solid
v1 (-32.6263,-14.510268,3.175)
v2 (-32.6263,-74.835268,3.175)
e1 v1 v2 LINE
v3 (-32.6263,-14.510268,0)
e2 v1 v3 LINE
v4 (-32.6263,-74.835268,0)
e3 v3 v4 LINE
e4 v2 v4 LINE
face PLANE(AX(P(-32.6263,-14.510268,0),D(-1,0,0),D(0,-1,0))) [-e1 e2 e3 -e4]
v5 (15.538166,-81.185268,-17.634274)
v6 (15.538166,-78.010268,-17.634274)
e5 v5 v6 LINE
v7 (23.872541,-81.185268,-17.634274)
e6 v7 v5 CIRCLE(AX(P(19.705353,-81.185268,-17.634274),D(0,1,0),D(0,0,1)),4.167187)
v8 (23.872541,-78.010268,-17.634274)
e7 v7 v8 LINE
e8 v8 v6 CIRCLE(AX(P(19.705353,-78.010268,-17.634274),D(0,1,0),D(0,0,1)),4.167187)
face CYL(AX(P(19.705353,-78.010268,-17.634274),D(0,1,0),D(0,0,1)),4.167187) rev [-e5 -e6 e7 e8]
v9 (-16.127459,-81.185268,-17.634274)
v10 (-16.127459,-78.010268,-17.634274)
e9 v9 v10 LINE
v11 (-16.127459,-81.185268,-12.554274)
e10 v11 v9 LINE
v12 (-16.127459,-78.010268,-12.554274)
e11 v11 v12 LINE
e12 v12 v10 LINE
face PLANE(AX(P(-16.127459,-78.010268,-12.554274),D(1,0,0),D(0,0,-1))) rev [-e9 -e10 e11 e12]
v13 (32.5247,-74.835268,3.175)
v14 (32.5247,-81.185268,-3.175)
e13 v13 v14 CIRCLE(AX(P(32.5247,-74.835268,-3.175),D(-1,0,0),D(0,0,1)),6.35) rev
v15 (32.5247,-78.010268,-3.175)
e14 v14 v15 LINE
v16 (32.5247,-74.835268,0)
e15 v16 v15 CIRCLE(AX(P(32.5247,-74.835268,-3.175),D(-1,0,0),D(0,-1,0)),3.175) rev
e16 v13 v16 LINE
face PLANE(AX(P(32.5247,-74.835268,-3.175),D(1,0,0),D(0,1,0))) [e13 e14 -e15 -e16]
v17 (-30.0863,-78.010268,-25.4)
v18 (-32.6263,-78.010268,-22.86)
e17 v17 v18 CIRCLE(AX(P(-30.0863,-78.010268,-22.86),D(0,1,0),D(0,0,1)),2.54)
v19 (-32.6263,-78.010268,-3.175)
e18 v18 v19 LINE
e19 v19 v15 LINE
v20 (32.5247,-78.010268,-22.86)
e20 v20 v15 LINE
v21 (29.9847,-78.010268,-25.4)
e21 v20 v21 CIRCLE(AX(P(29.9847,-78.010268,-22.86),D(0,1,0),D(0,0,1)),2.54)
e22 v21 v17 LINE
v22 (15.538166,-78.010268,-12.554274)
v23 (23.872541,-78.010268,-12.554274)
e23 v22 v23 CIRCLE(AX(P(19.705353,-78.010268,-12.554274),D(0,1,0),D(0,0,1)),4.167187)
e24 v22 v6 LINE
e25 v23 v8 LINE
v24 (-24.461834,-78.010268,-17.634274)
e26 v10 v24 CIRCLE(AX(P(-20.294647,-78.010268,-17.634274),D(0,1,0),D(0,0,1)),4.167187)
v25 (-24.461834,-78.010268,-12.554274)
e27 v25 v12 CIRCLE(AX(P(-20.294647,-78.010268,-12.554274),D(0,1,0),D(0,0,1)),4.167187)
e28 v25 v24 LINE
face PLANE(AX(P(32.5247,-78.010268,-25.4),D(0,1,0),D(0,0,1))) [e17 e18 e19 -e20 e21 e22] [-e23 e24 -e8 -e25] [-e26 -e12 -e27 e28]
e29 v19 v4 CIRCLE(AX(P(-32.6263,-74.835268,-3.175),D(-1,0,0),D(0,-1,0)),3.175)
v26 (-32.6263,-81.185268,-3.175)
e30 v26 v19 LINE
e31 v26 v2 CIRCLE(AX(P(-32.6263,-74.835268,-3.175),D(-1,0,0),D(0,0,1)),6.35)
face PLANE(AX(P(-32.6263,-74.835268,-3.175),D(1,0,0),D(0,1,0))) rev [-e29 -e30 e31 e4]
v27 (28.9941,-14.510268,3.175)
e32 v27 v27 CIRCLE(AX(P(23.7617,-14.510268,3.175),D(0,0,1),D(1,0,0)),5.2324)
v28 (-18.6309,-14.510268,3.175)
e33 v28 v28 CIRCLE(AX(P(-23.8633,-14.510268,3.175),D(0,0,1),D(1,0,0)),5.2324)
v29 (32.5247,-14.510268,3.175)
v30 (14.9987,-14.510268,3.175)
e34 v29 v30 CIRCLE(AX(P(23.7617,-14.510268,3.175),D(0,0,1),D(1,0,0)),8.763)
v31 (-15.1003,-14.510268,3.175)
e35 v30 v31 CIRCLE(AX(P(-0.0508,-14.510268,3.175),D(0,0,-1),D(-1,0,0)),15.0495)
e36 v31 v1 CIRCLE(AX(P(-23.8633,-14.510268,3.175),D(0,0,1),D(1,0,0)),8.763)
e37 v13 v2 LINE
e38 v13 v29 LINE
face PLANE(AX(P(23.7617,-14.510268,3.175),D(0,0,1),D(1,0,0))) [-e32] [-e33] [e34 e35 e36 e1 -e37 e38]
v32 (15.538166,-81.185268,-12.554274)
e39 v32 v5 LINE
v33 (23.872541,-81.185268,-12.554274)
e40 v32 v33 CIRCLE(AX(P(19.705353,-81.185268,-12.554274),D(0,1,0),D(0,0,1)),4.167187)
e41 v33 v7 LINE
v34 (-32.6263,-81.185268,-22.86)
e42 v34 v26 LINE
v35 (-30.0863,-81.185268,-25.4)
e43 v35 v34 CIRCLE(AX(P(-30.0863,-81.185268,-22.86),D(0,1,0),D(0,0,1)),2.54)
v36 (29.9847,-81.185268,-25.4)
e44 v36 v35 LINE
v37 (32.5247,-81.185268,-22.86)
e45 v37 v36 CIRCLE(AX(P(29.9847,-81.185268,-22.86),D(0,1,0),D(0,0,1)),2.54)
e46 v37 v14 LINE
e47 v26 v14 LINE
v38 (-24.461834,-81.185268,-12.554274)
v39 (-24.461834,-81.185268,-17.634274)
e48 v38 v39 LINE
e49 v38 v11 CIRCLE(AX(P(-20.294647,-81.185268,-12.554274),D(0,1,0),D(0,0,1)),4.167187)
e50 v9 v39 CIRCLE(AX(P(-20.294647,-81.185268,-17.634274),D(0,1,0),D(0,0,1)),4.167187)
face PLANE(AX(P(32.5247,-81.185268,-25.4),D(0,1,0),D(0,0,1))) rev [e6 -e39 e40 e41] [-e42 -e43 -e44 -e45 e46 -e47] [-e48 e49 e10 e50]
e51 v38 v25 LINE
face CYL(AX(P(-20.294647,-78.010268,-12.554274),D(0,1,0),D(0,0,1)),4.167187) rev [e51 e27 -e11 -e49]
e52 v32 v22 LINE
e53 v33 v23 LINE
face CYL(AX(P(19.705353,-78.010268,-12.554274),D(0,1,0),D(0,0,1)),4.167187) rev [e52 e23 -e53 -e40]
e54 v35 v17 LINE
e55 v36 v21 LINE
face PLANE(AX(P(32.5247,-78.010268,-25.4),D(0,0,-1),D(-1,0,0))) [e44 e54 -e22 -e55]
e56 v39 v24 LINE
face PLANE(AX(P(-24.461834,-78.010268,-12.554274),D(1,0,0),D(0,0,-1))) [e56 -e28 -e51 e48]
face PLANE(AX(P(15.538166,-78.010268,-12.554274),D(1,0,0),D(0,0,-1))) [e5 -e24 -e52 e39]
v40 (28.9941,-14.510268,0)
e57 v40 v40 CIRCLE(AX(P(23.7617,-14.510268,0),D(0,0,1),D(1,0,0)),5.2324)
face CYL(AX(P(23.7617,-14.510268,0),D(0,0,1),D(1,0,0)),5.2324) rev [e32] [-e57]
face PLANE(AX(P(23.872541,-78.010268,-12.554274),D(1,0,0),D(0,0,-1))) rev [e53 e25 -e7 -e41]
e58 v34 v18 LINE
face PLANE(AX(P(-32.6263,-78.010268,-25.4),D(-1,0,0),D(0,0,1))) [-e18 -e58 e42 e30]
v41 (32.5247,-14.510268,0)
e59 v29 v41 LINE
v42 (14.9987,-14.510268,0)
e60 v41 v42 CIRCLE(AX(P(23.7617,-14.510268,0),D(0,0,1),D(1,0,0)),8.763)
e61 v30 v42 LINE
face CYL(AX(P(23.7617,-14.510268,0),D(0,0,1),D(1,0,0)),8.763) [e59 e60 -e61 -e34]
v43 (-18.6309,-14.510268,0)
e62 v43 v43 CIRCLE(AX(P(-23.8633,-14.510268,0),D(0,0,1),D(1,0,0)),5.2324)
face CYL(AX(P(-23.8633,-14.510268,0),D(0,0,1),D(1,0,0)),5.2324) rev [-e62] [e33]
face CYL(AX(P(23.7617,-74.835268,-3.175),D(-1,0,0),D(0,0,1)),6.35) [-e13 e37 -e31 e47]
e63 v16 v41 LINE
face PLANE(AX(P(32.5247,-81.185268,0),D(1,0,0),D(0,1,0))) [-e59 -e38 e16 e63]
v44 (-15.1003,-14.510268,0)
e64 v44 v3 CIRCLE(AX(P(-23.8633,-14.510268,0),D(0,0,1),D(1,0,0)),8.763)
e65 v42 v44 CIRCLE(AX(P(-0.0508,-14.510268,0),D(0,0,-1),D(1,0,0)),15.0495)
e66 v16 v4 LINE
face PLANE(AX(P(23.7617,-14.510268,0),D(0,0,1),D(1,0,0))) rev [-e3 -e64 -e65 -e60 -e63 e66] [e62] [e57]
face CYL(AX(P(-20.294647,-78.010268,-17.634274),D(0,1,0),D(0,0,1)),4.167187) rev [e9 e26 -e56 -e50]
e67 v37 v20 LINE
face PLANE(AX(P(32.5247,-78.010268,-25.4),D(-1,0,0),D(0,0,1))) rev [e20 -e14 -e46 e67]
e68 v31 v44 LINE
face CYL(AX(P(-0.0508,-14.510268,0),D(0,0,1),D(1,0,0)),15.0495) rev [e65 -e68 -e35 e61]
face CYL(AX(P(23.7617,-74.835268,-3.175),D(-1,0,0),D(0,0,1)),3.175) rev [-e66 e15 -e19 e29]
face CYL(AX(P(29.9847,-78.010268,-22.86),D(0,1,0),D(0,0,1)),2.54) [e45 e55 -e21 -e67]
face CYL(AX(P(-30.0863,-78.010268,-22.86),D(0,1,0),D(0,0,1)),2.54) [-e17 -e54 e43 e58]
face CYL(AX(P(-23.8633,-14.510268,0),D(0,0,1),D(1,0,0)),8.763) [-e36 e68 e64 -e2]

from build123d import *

# Parameters (mm, degrees)
SKETCH1_R              = 5.2324
BOSS_EXTRUDE1_DEPTH    = 3.175
SKETCH2_W              = 65.151
SKETCH2_H              = 3.175
BOSS_EXTRUDE2_DEPTH    = 25.4
FILLET1_R              = 2.54
CUT_EXTRUDE1_DEPTH     = 3.175
CONVERT_SOLID1_START   = -32.6263
CONVERT_SOLID1_DEPTH   = 65.151
CONVERT_SOLID1_2_DEPTH = 65.151


# Read off the part's stored shape, not the designer's step: Convert-Solid1
with BuildPart() as part:
    # Sketch1 → Boss-Extrude1 (new body)
    with BuildSketch(Plane.XY):
        with BuildLine():
            Line((32.5247, -81.185268118), (32.5247, -14.510268118))
            ThreePointArc((32.5247, -14.510268118), (23.7617, -5.747268118), (14.9987, -14.510268118))
            ThreePointArc((14.9987, -14.510268118), (-0.0508, -29.559768118), (-15.1003, -14.510268118))
            ThreePointArc((-15.1003, -14.510268118), (-23.8633, -5.747268118), (-32.6263, -14.510268118))
            Line((-32.6263, -14.510268118), (-32.6263, -81.185268118))
            Line((-32.6263, -81.185268118), (32.5247, -81.185268118))
        make_face()
        with Locations((-23.8633, -14.510268118)):
            Circle(SKETCH1_R, mode=Mode.SUBTRACT)
        with Locations((23.7617, -14.510268118)):
            Circle(SKETCH1_R, mode=Mode.SUBTRACT)
    extrude(amount=BOSS_EXTRUDE1_DEPTH)

    # Sketch2 → Boss-Extrude2 (add)
    with BuildSketch(Plane(origin=(0, 0, 0), x_dir=(-1, 0, 0), z_dir=(0, 0, -1))):
        with Locations((0.0508, -79.597768118)):
            Rectangle(SKETCH2_W, SKETCH2_H)
    extrude(amount=BOSS_EXTRUDE2_DEPTH)

    # Fillet1
    fillet1_edges = [part.edges().sort_by_distance(p)[0] for p in [
        (32.5247, -79.597768118, -25.4),
        (-32.6263, -79.597768118, -25.4),
    ]]
    fillet(fillet1_edges, radius=FILLET1_R)

    # Sketch3 → Cut-Extrude1 (cut)
    with BuildSketch(Plane(origin=(0, -78.010268118, 0), x_dir=(1, 0, 0), z_dir=(0, 1, 0))):
        with BuildLine():
            Line((15.538165915, 12.554273752), (15.538165915, 17.634273752))
            ThreePointArc((15.538165915, 17.634273752), (19.705353415, 21.801461252), (23.872540915, 17.634273752))
            Line((23.872540915, 17.634273752), (23.872540915, 12.554273752))
            ThreePointArc((23.872540915, 12.554273752), (19.705353415, 8.387086252), (15.538165915, 12.554273752))
        make_face()
        with BuildLine():
            Line((-24.461834085, 12.554273752), (-24.461834085, 17.634273752))
            ThreePointArc((-24.461834085, 17.634273752), (-20.294646585, 21.801461252), (-16.127459085, 17.634273752))
            Line((-16.127459085, 17.634273752), (-16.127459085, 12.554273752))
            ThreePointArc((-16.127459085, 12.554273752), (-20.294646585, 8.387086252), (-24.461834085, 12.554273752))
        make_face()
    extrude(amount=-CUT_EXTRUDE1_DEPTH, mode=Mode.SUBTRACT)

    # Convert-Solid1 outline → Convert-Solid1 (cut)
    with BuildSketch(Plane.YZ.offset(CONVERT_SOLID1_START)):
        with BuildLine():
            Line((-81.185268118, 3.175), (-81.185268118, -3.175))
            ThreePointArc((-81.185268118, -3.175), (-79.325396179, 1.315128061), (-74.835268118, 3.175))
            Line((-74.835268118, 3.175), (-81.185268118, 3.175))
        make_face()
    extrude(amount=CONVERT_SOLID1_DEPTH, mode=Mode.SUBTRACT)

    # Convert-Solid1 2 outline → Convert-Solid1 2 (add)
    with BuildSketch(Plane.YZ.offset(CONVERT_SOLID1_START)):
        with BuildLine():
            Line((-78.010268118, 0), (-78.010268118, -3.175))
            ThreePointArc((-78.010268118, -3.175), (-77.080332148, -0.92993597), (-74.835268118, 0))
            Line((-74.835268118, 0), (-78.010268118, 0))
        make_face()
    extrude(amount=CONVERT_SOLID1_2_DEPTH)


solid = part.part
